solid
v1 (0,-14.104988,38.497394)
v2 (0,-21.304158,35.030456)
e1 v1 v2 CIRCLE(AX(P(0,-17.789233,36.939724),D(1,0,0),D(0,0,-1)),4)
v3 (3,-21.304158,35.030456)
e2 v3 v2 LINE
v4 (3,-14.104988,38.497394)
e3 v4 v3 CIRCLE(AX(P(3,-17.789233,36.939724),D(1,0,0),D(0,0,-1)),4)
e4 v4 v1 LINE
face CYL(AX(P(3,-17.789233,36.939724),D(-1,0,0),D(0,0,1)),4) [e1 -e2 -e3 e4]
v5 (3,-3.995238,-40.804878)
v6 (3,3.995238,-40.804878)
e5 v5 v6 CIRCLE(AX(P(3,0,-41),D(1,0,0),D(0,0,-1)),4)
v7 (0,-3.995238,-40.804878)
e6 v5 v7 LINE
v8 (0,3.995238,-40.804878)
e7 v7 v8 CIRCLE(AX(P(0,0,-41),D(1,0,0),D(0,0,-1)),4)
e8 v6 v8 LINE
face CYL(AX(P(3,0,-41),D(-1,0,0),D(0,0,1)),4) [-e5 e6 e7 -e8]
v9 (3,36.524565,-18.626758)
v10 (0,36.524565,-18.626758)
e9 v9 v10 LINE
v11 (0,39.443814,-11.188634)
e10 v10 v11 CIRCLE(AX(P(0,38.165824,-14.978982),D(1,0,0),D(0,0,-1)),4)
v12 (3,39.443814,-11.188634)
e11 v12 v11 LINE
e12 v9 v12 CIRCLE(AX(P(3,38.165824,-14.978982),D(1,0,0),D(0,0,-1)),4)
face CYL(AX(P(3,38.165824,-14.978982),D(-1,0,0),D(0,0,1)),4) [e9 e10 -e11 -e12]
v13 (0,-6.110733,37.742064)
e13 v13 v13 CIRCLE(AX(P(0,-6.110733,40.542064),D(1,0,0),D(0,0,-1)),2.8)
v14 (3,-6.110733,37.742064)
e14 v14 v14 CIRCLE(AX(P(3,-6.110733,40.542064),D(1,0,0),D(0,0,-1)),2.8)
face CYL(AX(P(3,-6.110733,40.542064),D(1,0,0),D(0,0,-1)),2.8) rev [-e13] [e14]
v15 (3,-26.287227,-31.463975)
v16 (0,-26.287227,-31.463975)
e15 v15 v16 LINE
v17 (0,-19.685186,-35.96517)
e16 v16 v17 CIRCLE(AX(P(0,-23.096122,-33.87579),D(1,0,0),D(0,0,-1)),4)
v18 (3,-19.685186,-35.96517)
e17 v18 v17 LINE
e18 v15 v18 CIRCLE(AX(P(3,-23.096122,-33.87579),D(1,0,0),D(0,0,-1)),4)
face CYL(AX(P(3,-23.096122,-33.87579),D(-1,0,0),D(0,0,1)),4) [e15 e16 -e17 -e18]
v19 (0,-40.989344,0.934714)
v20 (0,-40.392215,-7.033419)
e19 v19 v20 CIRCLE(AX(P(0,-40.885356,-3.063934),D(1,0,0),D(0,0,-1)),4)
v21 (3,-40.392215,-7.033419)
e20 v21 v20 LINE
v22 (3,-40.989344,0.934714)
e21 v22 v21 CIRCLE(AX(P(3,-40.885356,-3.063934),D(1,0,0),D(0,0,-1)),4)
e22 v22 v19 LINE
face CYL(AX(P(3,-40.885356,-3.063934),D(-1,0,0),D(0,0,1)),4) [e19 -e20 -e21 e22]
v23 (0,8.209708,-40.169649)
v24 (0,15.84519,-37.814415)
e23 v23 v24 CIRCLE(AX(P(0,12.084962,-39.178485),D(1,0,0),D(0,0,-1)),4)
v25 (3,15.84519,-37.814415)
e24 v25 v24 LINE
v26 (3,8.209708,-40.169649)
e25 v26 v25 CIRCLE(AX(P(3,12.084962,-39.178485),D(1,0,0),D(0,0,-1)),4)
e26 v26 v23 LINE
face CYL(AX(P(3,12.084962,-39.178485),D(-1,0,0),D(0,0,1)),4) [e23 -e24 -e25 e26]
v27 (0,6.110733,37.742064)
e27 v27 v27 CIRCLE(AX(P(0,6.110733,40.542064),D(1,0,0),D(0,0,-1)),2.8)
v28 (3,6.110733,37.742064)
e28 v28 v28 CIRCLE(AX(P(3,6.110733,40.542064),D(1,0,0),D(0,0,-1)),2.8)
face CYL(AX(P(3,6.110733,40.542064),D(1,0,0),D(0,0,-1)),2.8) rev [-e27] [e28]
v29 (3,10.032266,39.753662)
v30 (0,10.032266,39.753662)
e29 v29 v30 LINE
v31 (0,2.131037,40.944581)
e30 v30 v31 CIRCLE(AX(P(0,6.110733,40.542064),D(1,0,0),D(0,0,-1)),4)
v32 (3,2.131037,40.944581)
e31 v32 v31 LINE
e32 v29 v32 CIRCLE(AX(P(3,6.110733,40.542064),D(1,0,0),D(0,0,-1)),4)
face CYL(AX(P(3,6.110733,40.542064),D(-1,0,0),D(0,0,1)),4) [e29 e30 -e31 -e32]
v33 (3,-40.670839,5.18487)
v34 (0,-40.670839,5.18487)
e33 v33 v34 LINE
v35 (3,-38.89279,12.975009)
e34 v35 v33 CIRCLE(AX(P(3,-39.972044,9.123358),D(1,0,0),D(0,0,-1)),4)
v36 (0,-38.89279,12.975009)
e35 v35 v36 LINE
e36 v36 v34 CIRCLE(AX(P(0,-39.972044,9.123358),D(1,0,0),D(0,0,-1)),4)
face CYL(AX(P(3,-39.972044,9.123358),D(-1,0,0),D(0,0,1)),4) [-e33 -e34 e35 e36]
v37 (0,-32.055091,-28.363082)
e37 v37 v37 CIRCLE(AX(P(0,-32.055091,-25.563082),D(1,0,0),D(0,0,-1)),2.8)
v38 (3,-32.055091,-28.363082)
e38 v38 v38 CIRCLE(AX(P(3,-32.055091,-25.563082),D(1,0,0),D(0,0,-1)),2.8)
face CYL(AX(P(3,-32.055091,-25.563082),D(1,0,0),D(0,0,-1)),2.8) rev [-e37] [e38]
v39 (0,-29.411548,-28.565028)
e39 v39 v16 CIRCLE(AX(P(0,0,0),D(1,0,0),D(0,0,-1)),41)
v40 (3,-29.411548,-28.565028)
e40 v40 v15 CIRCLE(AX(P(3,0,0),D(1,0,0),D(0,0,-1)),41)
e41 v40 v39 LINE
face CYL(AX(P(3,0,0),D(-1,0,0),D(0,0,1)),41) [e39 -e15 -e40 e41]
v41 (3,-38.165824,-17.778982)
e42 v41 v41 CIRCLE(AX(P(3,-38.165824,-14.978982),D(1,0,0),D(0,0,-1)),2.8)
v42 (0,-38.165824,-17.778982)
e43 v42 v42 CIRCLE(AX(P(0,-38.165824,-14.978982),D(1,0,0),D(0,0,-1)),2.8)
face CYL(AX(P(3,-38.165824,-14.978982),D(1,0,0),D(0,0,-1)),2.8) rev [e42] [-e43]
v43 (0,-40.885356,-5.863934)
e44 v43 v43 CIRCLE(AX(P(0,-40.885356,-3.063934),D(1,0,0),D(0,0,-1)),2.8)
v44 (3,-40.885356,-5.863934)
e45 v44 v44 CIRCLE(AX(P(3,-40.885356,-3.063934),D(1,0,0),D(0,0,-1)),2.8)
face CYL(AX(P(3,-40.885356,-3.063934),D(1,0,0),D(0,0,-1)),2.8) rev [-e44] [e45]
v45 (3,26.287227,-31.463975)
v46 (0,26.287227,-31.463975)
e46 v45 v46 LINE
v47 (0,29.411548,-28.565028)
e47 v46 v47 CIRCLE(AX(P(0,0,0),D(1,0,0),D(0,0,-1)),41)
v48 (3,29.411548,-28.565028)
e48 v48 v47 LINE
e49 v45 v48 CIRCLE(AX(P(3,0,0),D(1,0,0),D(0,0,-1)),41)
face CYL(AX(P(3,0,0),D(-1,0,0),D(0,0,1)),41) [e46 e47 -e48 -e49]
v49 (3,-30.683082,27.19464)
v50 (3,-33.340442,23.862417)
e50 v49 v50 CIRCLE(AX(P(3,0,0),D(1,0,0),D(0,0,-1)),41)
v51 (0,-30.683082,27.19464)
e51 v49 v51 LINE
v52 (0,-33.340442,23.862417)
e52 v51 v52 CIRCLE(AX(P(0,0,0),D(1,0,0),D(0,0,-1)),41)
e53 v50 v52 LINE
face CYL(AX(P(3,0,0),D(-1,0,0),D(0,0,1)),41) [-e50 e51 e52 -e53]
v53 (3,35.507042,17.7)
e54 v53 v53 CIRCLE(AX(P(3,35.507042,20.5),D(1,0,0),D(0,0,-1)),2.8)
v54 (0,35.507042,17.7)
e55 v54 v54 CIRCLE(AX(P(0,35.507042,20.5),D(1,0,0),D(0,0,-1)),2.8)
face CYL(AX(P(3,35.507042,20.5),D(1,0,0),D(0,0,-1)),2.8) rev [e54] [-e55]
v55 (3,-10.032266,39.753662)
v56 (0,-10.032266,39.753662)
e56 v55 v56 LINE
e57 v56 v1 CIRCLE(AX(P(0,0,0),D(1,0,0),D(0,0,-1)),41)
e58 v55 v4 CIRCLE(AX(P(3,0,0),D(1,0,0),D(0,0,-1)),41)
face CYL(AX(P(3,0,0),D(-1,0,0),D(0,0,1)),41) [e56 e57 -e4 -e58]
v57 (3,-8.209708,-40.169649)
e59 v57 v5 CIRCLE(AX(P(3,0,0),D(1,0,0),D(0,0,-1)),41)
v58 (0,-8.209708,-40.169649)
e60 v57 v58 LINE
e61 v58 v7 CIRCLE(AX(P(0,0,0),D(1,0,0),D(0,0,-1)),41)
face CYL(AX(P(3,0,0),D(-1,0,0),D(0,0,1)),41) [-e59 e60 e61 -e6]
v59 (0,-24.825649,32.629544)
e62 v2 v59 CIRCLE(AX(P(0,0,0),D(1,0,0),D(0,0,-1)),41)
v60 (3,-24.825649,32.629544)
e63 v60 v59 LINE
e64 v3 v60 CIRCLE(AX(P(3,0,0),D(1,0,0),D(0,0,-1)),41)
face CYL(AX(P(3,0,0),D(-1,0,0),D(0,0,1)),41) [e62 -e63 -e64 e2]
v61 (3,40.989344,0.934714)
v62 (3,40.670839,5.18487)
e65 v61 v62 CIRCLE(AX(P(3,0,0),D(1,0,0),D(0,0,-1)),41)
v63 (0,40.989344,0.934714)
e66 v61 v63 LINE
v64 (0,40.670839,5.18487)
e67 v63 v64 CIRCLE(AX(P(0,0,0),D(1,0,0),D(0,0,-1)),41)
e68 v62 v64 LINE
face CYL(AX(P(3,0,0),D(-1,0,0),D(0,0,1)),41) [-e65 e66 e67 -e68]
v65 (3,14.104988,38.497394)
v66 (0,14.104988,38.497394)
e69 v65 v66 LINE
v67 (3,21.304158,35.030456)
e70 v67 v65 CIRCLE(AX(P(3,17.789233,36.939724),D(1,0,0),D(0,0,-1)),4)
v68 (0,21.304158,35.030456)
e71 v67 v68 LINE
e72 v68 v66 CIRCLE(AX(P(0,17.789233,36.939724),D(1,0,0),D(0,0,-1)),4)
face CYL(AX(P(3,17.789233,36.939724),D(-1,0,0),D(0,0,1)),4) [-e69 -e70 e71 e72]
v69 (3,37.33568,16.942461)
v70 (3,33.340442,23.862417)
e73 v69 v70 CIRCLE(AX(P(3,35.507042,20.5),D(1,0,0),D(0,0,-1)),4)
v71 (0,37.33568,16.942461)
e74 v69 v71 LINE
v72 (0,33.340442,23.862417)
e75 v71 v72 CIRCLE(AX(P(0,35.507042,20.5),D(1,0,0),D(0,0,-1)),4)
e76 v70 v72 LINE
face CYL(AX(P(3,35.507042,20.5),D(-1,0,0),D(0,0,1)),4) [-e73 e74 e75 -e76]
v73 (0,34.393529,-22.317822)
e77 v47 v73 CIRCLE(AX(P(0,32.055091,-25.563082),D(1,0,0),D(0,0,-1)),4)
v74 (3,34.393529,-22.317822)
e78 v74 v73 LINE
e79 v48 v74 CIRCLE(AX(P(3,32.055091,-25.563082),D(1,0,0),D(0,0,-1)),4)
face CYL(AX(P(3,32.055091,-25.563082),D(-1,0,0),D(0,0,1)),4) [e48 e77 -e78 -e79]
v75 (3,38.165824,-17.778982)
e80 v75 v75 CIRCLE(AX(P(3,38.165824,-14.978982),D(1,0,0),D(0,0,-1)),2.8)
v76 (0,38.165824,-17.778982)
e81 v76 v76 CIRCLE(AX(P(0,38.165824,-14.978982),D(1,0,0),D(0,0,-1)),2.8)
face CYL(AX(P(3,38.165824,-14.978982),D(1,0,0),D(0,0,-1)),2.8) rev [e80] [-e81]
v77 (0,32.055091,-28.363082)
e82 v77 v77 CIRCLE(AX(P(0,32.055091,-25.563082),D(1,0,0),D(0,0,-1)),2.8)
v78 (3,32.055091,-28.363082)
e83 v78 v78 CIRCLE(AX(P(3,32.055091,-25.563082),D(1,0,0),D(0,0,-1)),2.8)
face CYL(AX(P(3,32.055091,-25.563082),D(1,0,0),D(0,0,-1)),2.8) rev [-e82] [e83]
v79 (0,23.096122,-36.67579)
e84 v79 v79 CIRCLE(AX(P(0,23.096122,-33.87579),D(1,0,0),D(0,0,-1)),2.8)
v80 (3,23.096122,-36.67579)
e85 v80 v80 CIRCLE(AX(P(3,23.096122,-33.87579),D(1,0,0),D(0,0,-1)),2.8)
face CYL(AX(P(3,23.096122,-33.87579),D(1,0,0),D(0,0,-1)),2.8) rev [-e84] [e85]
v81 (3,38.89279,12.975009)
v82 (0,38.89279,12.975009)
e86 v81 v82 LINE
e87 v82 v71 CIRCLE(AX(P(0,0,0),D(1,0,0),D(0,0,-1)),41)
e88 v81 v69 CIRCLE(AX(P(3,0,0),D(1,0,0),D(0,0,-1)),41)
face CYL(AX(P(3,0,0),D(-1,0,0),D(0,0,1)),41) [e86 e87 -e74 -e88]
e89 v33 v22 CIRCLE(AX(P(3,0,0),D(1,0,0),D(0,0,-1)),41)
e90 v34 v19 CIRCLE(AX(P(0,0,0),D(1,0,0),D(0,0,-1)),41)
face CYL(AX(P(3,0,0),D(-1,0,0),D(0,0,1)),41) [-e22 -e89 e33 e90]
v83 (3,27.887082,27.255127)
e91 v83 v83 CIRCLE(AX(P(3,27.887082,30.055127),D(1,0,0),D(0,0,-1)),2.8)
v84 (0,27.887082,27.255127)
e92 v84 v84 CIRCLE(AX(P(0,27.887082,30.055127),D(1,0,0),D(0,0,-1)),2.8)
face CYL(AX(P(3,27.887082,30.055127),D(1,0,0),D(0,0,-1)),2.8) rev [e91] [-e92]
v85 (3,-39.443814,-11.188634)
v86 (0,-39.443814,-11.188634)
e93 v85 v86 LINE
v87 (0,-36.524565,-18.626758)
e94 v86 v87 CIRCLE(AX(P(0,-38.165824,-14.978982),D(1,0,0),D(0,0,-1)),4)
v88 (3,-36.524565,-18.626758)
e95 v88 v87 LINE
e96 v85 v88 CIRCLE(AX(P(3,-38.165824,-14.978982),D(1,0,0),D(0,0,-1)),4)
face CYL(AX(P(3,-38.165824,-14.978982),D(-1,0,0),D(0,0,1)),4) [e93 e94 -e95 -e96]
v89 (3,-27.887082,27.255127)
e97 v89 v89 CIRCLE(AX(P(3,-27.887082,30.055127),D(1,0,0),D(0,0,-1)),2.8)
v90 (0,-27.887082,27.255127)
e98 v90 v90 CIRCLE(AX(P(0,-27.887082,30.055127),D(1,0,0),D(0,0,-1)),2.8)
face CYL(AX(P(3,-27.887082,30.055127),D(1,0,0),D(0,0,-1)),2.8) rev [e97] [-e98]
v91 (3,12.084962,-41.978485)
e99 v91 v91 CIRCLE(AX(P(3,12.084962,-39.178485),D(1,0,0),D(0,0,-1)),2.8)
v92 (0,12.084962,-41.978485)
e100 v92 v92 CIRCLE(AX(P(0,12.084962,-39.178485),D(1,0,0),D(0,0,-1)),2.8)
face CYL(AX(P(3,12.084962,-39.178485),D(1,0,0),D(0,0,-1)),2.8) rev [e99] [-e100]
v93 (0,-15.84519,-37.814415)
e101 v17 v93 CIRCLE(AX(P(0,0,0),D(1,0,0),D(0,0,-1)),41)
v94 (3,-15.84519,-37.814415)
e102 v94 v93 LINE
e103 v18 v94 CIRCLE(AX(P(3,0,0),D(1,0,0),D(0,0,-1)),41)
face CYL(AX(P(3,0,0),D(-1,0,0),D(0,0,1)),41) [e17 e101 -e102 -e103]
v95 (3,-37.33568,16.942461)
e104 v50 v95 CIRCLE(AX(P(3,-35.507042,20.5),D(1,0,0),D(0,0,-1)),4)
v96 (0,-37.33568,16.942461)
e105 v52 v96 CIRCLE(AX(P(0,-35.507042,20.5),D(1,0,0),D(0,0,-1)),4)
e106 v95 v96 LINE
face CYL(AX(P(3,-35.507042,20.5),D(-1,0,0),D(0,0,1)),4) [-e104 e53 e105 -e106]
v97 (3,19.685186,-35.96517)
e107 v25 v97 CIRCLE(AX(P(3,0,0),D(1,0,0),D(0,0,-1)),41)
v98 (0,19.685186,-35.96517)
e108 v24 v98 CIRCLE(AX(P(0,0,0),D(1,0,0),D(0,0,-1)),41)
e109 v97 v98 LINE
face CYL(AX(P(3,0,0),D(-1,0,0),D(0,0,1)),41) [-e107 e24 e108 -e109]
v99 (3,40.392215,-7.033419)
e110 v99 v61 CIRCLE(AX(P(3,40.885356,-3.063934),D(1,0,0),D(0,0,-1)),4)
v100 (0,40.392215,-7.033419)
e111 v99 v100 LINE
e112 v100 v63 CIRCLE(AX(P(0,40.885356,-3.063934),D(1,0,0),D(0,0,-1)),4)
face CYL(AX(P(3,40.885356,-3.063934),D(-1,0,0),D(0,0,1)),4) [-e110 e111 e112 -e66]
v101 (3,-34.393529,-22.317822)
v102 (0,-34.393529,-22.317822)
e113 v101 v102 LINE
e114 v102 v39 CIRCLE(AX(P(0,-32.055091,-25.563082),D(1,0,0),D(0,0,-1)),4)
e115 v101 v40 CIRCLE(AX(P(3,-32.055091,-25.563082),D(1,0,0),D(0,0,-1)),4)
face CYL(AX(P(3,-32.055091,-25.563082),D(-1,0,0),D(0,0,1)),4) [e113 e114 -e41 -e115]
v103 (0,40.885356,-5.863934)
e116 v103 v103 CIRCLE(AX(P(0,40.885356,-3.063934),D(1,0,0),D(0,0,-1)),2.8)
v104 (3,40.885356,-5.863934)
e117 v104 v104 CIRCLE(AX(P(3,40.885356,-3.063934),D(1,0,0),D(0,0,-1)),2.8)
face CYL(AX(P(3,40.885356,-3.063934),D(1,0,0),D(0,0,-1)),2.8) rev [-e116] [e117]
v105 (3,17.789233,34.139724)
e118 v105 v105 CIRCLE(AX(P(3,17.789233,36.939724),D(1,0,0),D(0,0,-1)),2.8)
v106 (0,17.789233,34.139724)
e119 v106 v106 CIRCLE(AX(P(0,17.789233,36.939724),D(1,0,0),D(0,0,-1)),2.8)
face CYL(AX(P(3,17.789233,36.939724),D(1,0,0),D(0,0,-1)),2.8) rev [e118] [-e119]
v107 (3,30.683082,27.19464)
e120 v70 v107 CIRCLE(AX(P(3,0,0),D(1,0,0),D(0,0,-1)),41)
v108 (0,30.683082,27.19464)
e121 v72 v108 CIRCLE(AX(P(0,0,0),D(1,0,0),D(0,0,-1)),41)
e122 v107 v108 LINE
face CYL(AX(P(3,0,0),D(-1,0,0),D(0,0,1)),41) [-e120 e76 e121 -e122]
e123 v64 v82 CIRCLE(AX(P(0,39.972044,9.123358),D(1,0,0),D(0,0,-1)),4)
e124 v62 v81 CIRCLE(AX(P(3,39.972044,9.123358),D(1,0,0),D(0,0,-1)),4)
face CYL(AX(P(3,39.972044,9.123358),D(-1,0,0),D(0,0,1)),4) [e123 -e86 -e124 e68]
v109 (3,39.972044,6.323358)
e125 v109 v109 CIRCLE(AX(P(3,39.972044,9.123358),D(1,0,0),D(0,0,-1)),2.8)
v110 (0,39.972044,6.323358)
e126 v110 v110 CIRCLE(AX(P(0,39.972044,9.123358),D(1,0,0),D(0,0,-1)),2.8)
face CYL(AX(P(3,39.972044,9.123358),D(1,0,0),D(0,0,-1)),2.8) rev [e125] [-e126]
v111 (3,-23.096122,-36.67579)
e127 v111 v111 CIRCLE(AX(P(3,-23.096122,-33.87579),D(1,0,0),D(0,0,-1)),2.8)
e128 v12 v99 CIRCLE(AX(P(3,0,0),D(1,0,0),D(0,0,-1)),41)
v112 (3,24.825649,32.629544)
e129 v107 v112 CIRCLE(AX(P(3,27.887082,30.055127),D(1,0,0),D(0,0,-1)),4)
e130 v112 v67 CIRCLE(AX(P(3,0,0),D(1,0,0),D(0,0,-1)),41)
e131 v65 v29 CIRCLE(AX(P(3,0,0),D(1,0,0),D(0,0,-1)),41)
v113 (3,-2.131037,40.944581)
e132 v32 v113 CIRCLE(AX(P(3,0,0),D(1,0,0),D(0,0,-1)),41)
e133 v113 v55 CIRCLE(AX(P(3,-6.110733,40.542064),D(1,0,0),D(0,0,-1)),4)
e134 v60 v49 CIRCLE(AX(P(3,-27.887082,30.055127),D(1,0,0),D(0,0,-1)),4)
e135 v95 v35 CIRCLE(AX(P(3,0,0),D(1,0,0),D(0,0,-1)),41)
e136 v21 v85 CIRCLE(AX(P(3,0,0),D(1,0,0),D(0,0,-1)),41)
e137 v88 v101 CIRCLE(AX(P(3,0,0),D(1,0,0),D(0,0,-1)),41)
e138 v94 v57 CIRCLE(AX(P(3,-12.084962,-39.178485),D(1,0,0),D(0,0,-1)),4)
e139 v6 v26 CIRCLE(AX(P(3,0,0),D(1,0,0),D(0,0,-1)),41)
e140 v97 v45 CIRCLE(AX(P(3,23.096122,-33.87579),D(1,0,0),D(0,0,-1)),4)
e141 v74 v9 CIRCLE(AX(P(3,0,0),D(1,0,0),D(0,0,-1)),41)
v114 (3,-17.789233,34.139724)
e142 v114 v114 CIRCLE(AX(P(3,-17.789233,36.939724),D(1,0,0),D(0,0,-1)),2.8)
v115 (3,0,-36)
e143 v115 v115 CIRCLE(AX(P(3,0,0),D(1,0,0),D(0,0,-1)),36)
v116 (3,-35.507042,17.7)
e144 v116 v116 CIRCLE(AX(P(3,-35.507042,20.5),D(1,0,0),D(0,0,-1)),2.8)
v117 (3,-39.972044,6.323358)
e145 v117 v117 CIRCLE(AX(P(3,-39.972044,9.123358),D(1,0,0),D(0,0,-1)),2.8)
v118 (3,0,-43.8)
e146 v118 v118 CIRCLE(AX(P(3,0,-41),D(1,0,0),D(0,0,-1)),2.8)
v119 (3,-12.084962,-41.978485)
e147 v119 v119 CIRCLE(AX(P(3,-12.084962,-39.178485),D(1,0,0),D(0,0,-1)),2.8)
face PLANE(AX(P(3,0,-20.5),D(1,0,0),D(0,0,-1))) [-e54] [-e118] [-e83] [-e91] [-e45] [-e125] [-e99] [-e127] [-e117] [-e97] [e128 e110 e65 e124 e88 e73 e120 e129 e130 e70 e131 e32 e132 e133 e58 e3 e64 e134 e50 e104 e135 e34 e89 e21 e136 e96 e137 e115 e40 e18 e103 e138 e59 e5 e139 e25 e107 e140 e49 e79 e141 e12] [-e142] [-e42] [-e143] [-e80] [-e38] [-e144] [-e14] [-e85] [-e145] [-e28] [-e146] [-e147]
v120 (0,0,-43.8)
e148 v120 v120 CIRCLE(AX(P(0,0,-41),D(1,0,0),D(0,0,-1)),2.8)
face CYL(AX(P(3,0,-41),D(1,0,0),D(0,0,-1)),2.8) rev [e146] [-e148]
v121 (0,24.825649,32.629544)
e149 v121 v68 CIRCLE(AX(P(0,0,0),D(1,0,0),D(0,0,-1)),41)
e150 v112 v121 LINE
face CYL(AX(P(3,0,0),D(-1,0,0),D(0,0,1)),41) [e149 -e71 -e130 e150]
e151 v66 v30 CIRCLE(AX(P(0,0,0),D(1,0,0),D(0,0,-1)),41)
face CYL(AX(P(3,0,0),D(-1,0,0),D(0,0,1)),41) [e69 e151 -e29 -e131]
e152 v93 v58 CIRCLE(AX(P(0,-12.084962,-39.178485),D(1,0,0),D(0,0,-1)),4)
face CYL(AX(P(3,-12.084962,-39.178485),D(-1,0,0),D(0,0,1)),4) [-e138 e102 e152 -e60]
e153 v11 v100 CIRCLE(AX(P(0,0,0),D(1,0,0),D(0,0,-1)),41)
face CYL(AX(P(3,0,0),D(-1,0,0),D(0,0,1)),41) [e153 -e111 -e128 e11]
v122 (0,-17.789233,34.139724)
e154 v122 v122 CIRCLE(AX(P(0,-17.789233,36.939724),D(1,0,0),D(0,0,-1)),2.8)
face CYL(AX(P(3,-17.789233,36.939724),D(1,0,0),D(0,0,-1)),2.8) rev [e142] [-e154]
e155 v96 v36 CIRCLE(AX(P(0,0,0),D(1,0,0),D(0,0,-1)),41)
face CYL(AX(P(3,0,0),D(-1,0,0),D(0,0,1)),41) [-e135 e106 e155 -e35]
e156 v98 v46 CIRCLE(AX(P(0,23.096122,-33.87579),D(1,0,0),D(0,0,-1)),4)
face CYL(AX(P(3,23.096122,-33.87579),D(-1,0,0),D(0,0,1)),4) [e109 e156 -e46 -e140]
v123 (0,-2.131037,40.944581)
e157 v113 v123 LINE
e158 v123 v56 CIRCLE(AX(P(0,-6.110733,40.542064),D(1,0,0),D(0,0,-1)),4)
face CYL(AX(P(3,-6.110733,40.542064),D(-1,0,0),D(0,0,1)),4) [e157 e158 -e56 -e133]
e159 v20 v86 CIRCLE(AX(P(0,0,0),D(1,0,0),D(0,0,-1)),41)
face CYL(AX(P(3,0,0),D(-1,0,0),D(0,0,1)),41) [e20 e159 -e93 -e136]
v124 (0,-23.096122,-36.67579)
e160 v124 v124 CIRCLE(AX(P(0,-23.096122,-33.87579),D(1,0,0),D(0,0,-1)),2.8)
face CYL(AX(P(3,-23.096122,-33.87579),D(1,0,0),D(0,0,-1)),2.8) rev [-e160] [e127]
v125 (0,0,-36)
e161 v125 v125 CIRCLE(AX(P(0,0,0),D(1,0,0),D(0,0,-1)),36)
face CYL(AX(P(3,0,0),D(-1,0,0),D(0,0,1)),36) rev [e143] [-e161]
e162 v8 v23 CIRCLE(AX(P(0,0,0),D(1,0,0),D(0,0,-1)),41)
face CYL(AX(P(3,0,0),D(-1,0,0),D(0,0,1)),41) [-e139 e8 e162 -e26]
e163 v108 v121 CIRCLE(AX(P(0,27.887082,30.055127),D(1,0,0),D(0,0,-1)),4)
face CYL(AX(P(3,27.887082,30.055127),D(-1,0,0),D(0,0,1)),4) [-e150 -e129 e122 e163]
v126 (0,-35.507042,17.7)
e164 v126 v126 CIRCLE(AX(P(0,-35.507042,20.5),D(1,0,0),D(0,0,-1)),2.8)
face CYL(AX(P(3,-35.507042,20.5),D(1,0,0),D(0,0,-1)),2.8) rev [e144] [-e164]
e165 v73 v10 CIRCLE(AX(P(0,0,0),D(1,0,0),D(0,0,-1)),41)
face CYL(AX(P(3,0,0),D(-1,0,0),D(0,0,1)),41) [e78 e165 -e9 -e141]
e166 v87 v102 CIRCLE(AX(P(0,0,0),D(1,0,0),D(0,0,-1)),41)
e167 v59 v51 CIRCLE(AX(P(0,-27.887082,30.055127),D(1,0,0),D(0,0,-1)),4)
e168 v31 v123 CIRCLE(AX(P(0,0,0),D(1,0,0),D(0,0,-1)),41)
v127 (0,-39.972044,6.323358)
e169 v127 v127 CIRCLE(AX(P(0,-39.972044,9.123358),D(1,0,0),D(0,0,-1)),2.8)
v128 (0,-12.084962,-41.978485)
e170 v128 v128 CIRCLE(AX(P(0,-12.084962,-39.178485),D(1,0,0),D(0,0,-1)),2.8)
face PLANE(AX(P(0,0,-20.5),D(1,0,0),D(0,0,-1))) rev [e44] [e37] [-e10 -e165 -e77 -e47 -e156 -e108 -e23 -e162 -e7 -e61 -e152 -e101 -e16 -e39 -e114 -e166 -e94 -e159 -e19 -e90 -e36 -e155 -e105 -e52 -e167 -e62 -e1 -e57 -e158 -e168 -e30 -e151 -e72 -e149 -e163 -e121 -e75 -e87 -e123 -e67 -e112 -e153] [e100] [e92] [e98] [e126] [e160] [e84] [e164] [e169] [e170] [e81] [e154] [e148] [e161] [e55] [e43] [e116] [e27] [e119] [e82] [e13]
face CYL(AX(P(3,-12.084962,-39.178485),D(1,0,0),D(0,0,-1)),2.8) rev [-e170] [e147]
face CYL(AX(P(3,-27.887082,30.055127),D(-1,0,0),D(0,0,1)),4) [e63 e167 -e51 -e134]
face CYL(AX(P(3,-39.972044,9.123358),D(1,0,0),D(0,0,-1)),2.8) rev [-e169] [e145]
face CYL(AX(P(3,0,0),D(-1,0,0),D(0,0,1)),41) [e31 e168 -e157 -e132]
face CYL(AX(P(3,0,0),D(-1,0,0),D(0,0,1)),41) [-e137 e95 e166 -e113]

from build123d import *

# Parameters (mm, degrees)
LINEAR_AUSTRAGEN_D_NN1_OUTLINE_R = 36
LINEAR_AUSTRAGEN_D_NN1_DEPTH     = 3
F_5_6_5_6_DURCHMESSER_BOHRUNG1_D = 5.6
KREISMUSTER1_COUNT               = 21


# Read off the part's stored shape, not the designer's step: Linear-Austragen-Dünn1
with BuildPart() as part:
    # Linear-Austragen-Dünn1 outline → Linear-Austragen-Dünn1 (new body)
    with BuildSketch(Plane(origin=(0, 0, 0), x_dir=(0, 0, -1), z_dir=(1, 0, 0))):
        with BuildLine():
            ThreePointArc((40.804878049, -3.995238094), (45, 0), (40.804878049, 3.995238094))
            ThreePointArc((40.804878049, 3.995238094), (40.542063875, 6.110732913), (40.169648908, 8.209708071))
            ThreePointArc((40.169648908, 8.209708071), (43.00077626, 13.263982848), (37.814414706, 15.845189821))
            ThreePointArc((37.814414706, 15.845189821), (36.939723584, 17.789233304), (35.96517018, 19.685185646))
            ThreePointArc((35.96517018, 19.685185646), (37.180744844, 25.349402613), (31.46397467, 26.287226897))
            ThreePointArc((31.46397467, 26.287226897), (30.055126745, 27.887082249), (28.565028251, 29.411548089))
            ThreePointArc((28.565028251, 29.411548089), (28.057041084, 35.182416711), (22.317822408, 34.393528504))
            ThreePointArc((22.317822408, 34.393528504), (20.5, 35.507041555), (18.626758206, 36.524565415))
            ThreePointArc((18.626758206, 36.524565415), (16.440346096, 41.889318689), (11.188633685, 39.44381417))
            ThreePointArc((11.188633685, 39.44381417), (9.123358292, 39.972044399), (7.033418953, 40.392214817))
            ThreePointArc((7.033418953, 40.392214817), (3.362854211, 44.874170873), (-0.934714242, 40.98934385))
            ThreePointArc((-0.934714242, 40.98934385), (-3.063933837, 40.885355684), (-5.18487044, 40.670838675))
            ThreePointArc((-5.18487044, 40.670838675), (-10.013442028, 43.871756048), (-12.975008707, 38.892790451))
            ThreePointArc((-12.975008707, 38.892790451), (-14.978981999, 38.165823694), (-16.942461341, 37.335680035))
            ThreePointArc((-16.942461341, 37.335680035), (-22.5, 38.97114317), (-23.862416708, 33.340441942))
            ThreePointArc((-23.862416708, 33.340441942), (-25.563081876, 32.055090781), (-27.194640201, 30.68308238))
            ThreePointArc((-27.194640201, 30.68308238), (-32.987334232, 30.6077732), (-32.629544266, 24.825648854))
            ThreePointArc((-32.629544266, 24.825648854), (-33.875789747, 23.096122381), (-35.030455938, 21.304158204))
            ThreePointArc((-35.030455938, 21.304158204), (-40.543599056, 19.52476826), (-38.497393623, 14.10498792))
            ThreePointArc((-38.497393623, 14.10498792), (-39.178485037, 12.084962151), (-39.753661936, 10.03226608))
            ThreePointArc((-39.753661936, 10.03226608), (-44.49738718, 6.706901977), (-40.944580614, 2.13103691))
            ThreePointArc((-40.944580614, 2.13103691), (-41, 0), (-40.944580614, -2.13103691))
            ThreePointArc((-40.944580614, -2.13103691), (-44.49738718, -6.706901977), (-39.753661936, -10.03226608))
            ThreePointArc((-39.753661936, -10.03226608), (-39.178485037, -12.084962151), (-38.497393623, -14.10498792))
            ThreePointArc((-38.497393623, -14.10498792), (-40.543599056, -19.52476826), (-35.030455938, -21.304158204))
            ThreePointArc((-35.030455938, -21.304158204), (-33.875789747, -23.096122381), (-32.629544266, -24.825648854))
            ThreePointArc((-32.629544266, -24.825648854), (-32.987334232, -30.6077732), (-27.194640201, -30.68308238))
            ThreePointArc((-27.194640201, -30.68308238), (-25.563081876, -32.055090781), (-23.862416708, -33.340441942))
            ThreePointArc((-23.862416708, -33.340441942), (-22.5, -38.97114317), (-16.942461341, -37.335680035))
            ThreePointArc((-16.942461341, -37.335680035), (-14.978981999, -38.165823694), (-12.975008707, -38.892790451))
            ThreePointArc((-12.975008707, -38.892790451), (-10.013442028, -43.871756048), (-5.18487044, -40.670838675))
            ThreePointArc((-5.18487044, -40.670838675), (-3.063933837, -40.885355684), (-0.934714242, -40.98934385))
            ThreePointArc((-0.934714242, -40.98934385), (3.362854211, -44.874170873), (7.033418953, -40.392214817))
            ThreePointArc((7.033418953, -40.392214817), (9.123358292, -39.972044399), (11.188633685, -39.44381417))
            ThreePointArc((11.188633685, -39.44381417), (16.440346096, -41.889318689), (18.626758206, -36.524565415))
            ThreePointArc((18.626758206, -36.524565415), (20.5, -35.507041555), (22.317822408, -34.393528504))
            ThreePointArc((22.317822408, -34.393528504), (28.057041084, -35.182416711), (28.565028251, -29.411548089))
            ThreePointArc((28.565028251, -29.411548089), (30.055126745, -27.887082249), (31.46397467, -26.287226897))
            ThreePointArc((31.46397467, -26.287226897), (37.180744844, -25.349402613), (35.96517018, -19.685185646))
            ThreePointArc((35.96517018, -19.685185646), (36.939723584, -17.789233304), (37.814414706, -15.845189821))
            ThreePointArc((37.814414706, -15.845189821), (43.00077626, -13.263982848), (40.169648908, -8.209708071))
            ThreePointArc((40.169648908, -8.209708071), (40.542063875, -6.110732913), (40.804878049, -3.995238094))
        make_face()
        Circle(LINEAR_AUSTRAGEN_D_NN1_OUTLINE_R, mode=Mode.SUBTRACT)
    extrude(amount=LINEAR_AUSTRAGEN_D_NN1_DEPTH)

    # Ø5.6 (5.6) Durchmesser Bohrung1 (through all)
    with Locations(Plane(origin=(3, 0, 0), x_dir=(0, 0, -1), z_dir=(1, 0, 0))):
        with Locations((41, 0)):
            f_5_6_5_6_durchmesser_bohrung1 = Hole(F_5_6_5_6_DURCHMESSER_BOHRUNG1_D / 2)

    # Kreismuster1: Ø5.6 (5.6) Durchmesser Bohrung1 ×21 about axis
    kreismuster1_axis = Axis((0, 0, 0), (1, 0, 0))
    for i in range(1, KREISMUSTER1_COUNT):
        add(f_5_6_5_6_durchmesser_bohrung1.rotate(kreismuster1_axis, i * 360 / KREISMUSTER1_COUNT), mode=Mode.SUBTRACT)


solid = part.part
